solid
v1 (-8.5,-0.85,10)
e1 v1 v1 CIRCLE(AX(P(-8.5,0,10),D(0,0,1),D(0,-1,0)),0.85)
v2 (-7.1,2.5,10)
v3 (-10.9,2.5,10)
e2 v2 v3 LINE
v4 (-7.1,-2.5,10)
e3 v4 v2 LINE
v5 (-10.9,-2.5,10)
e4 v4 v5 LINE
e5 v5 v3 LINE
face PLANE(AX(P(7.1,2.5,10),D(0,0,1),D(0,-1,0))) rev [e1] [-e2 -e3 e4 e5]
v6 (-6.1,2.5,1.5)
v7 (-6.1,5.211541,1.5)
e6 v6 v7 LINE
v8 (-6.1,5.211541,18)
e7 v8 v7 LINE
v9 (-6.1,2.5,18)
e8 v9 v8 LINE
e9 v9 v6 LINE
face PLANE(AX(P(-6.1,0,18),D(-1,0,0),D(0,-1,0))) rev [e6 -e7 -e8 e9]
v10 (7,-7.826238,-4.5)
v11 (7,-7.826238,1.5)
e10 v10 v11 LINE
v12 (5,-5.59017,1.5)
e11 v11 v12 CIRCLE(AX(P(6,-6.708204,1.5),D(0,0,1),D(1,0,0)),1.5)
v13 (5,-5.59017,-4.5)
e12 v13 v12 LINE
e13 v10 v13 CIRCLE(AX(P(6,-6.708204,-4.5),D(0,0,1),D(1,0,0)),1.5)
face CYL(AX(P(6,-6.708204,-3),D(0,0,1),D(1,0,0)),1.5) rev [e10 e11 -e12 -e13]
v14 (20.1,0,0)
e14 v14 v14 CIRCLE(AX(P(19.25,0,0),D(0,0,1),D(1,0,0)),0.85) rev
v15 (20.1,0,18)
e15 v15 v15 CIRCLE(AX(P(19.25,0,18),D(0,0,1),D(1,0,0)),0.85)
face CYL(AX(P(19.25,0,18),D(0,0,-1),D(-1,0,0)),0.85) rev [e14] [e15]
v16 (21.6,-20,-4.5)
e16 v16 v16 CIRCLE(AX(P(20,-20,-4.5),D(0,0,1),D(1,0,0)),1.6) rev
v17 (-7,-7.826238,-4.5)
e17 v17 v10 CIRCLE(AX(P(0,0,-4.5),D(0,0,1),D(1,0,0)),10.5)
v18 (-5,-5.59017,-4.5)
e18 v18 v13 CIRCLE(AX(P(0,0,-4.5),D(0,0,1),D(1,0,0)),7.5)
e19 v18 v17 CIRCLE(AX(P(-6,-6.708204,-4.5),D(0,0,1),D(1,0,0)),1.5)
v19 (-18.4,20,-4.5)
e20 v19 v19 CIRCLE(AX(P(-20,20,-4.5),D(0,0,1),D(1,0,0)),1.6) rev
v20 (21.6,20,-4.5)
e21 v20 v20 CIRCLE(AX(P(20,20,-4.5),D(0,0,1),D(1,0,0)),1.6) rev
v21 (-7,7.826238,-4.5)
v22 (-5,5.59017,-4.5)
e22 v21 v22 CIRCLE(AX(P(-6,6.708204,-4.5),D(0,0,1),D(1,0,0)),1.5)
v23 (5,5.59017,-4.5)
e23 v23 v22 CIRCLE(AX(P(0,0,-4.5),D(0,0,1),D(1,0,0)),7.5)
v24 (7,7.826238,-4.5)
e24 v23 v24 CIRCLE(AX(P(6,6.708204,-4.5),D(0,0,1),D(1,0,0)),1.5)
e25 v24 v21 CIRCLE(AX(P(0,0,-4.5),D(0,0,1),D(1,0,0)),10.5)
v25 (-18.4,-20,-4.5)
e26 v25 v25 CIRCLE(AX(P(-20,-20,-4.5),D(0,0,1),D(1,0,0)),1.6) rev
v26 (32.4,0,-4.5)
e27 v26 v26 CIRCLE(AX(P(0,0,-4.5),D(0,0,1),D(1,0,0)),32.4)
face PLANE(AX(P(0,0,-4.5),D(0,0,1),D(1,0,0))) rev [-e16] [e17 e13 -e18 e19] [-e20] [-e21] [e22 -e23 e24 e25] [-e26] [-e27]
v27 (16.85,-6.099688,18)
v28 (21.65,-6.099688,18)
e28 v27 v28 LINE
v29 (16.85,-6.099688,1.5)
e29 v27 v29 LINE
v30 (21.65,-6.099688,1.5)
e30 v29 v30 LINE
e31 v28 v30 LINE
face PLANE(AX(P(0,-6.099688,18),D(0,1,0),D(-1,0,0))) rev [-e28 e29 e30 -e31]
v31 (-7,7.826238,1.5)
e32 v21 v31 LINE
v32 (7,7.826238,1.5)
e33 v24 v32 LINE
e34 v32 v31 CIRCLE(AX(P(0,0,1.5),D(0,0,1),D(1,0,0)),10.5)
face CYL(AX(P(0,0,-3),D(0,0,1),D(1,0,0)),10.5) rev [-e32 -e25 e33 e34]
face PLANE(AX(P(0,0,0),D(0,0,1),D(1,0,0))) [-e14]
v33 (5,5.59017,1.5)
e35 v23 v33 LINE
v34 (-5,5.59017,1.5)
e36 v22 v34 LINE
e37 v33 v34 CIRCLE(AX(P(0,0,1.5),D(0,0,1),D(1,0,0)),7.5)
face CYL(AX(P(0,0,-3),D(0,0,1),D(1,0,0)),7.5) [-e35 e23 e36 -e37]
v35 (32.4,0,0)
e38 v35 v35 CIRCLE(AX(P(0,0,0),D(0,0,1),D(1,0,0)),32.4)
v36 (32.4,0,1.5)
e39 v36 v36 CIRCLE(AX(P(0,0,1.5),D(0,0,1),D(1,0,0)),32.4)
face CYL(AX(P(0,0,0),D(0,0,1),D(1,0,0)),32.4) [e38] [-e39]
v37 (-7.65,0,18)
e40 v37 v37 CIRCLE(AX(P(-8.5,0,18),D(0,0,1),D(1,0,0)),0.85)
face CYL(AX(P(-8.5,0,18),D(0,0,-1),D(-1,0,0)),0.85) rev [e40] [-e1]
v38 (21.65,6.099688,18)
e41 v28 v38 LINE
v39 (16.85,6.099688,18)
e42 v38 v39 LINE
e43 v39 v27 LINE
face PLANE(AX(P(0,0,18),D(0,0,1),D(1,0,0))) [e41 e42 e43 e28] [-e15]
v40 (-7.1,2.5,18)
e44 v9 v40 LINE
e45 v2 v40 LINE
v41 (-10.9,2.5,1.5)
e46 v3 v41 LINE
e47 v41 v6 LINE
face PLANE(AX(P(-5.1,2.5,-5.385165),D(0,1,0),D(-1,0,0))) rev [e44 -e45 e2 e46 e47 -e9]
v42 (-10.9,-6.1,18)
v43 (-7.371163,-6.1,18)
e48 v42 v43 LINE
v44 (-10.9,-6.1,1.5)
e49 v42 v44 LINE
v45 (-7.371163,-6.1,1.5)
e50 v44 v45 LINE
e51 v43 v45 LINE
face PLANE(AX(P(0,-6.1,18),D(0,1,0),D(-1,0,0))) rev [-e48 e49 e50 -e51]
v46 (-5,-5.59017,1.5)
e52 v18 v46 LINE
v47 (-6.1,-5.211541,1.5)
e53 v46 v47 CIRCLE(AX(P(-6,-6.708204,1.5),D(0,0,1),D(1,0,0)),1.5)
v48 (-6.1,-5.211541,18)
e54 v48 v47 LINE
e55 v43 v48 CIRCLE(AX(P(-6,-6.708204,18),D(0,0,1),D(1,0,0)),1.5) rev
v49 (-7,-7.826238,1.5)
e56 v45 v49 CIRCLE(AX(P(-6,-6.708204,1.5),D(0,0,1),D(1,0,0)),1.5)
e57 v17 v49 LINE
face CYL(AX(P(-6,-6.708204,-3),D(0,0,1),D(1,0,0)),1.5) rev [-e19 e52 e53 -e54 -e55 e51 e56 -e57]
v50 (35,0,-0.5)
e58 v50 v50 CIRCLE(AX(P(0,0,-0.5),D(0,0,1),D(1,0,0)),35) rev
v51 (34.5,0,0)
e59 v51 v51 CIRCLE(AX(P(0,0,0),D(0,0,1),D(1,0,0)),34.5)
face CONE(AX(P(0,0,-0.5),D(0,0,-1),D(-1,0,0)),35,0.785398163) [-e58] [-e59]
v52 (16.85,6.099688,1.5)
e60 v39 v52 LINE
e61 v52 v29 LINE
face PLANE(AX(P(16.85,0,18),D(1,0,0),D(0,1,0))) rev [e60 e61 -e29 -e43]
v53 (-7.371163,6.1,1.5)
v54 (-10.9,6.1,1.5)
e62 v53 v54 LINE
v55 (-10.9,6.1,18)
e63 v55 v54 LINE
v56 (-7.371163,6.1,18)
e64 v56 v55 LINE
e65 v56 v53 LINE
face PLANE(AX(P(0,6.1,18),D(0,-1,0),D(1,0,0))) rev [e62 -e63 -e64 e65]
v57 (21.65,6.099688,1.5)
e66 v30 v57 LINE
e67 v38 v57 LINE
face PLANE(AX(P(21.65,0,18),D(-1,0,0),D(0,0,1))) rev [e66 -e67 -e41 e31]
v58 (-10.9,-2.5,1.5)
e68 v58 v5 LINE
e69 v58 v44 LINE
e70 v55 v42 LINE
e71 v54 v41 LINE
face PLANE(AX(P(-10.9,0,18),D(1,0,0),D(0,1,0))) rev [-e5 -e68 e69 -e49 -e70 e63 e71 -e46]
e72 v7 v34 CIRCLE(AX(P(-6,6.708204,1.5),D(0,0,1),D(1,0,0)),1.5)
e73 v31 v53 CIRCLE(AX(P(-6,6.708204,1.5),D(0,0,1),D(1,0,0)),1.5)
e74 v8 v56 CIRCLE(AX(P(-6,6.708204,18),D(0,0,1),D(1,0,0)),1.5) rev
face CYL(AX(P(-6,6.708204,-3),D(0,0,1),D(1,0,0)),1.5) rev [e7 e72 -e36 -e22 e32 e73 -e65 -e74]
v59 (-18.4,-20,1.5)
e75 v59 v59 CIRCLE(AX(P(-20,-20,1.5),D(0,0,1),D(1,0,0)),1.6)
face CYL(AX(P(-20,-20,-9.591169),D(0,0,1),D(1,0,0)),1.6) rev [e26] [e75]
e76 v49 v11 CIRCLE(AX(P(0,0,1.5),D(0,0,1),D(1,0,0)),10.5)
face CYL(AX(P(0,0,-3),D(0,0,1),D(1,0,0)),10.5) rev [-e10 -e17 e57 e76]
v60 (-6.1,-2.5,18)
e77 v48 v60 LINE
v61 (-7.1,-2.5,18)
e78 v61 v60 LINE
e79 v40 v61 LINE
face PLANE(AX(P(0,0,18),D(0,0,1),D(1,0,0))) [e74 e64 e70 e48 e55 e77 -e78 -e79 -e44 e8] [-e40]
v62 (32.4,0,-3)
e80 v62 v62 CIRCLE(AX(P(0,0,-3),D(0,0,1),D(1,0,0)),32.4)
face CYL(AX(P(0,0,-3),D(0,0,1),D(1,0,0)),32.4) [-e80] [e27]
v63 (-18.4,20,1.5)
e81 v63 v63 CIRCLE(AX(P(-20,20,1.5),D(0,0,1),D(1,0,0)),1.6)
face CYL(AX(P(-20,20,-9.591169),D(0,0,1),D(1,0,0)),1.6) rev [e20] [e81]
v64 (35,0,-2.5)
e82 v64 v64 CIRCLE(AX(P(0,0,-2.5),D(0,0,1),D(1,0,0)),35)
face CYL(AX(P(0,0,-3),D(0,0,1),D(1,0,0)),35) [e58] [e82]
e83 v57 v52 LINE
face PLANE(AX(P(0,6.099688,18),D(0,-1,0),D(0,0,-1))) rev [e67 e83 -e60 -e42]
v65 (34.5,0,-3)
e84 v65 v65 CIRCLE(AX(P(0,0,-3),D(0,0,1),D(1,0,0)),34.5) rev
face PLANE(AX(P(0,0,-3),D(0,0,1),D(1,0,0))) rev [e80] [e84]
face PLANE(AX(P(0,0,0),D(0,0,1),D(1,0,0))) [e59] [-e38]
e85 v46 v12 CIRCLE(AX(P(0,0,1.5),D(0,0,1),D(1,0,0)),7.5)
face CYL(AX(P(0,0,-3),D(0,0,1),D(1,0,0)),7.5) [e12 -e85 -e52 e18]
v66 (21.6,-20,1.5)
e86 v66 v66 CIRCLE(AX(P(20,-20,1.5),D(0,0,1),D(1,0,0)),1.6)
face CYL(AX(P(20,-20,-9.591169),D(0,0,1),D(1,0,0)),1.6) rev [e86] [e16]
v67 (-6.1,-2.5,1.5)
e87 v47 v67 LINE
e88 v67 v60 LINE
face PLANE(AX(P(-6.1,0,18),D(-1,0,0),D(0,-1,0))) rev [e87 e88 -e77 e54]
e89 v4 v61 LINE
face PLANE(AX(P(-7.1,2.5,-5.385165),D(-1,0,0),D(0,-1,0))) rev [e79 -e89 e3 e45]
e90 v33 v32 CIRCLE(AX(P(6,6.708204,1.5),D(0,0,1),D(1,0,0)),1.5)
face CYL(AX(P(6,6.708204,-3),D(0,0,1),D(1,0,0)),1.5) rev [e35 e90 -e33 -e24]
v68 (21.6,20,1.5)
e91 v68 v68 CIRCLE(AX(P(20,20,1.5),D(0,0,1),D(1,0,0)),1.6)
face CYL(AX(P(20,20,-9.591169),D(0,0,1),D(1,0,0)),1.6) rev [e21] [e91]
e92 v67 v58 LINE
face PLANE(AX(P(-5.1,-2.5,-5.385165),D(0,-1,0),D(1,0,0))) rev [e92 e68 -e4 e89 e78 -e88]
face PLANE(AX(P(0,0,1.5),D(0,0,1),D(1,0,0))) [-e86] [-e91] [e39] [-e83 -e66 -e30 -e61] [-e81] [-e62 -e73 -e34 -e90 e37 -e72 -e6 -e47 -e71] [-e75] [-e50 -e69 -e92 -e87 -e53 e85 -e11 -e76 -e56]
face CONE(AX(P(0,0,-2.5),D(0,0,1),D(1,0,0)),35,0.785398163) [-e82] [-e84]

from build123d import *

# Parameters (mm, degrees)
SKIZZE1_R                       = 32.4
SKIZZE1_R_2                     = 1.8
AUFSATZ_LINEAR_AUSTRAGEN1_DEPTH = 3
SCHNITT_LINEAR_AUSTRAGEN1_DEPTH = 46.918623673
AUFSATZ_LINEAR_START            = 18
SKIZZE4_R                       = 0.85
SKIZZE4_W                       = 4.8
SKIZZE4_H                       = 12.19937625
AUFSATZ_LINEAR_AUSTRAGEN2_DEPTH = 18
SKIZZE5_W                       = 2
SKIZZE5_H                       = 5
SCHNITT_LINEAR_AUSTRAGEN2_DEPTH = 18
SKIZZE6_W                       = 10
SKIZZE6_H                       = 5
SCHNITT_LINEAR_AUSTRAGEN3_DEPTH = 18
FL_CHE_VERSCHIEBEN1_BY          = 1.5
SKIZZE8_R                       = 35
SKIZZE8_R_2                     = 32.4
AUFSATZ_LINEAR_AUSTRAGEN3_DEPTH = 3
SKIZZE9_R                       = 1.8
SKIZZE9_R_2                     = 1.6
AUFSATZ_LINEAR_AUSTRAGEN4_DEPTH = 4.5
FL_CHE_VERSCHIEBEN2_OUTLINE_R   = 35
FL_CHE_VERSCHIEBEN2_OUTLINE_R_2 = 1.6
FL_CHE_VERSCHIEBEN2_OUTLINE_W   = 4.8
FL_CHE_VERSCHIEBEN2_OUTLINE_H   = 12.19937625
FL_CHE_VERSCHIEBEN2_DEPTH       = 1.5
SKIZZE10_R                      = 36.675991258
SKIZZE10_R_2                    = 32.4
SCHNITT_LINEAR_AUSTRAGEN4_DEPTH = 1.5
FASE1_SIZE                      = 0.5


# Read off the part's stored shape, not the designer's step: Fläche verschieben2
with BuildPart() as part:
    # Skizze1 → Aufsatz-Linear austragen1 (new body)
    with BuildSketch(Plane.XY):
        Circle(SKIZZE1_R)
        with Locations((-20, -20)):
            Circle(SKIZZE1_R_2, mode=Mode.SUBTRACT)
        with Locations((20, -20)):
            Circle(SKIZZE1_R_2, mode=Mode.SUBTRACT)
        with Locations((20, 20)):
            Circle(SKIZZE1_R_2, mode=Mode.SUBTRACT)
        with Locations((-20, 20)):
            Circle(SKIZZE1_R_2, mode=Mode.SUBTRACT)
    extrude(amount=-AUFSATZ_LINEAR_AUSTRAGEN1_DEPTH)

    # Skizze2 → Schnitt-Linear austragen1 (cut, through all)
    with BuildSketch(Plane.XY):
        with BuildLine():
            ThreePointArc((5, 5.590169944), (0, 7.5), (-5, 5.590169944))
            ThreePointArc((-5, 5.590169944), (-5.511799249, 5.289873919), (-6.1, 5.211540978))
            ThreePointArc((-6.1, 5.211540978), (-6.859313681, 5.478740636), (-7.371163001, 6.1))
            ThreePointArc((-7.371163001, 6.1), (-7.466484857, 7.023516737), (-7, 7.826237921))
            ThreePointArc((-7, 7.826237921), (0, 10.5), (7, 7.826237921))
            ThreePointArc((7, 7.826237921), (7.118033989, 5.708203932), (5, 5.590169944))
        make_face()
        with BuildLine():
            ThreePointArc((-7, -7.826237921), (0, -10.5), (7, -7.826237921))
            ThreePointArc((7, -7.826237921), (7.118033989, -5.708203932), (5, -5.590169944))
            ThreePointArc((5, -5.590169944), (0, -7.5), (-5, -5.590169944))
            ThreePointArc((-5, -5.590169944), (-5.511799249, -5.289873919), (-6.1, -5.211540978))
            ThreePointArc((-6.1, -5.211540978), (-6.859313681, -5.478740636), (-7.371163001, -6.1))
            ThreePointArc((-7.371163001, -6.1), (-7.466484857, -7.023516737), (-7, -7.826237921))
        make_face()
    extrude(amount=-SCHNITT_LINEAR_AUSTRAGEN1_DEPTH, mode=Mode.SUBTRACT)

    # Skizze4 → Aufsatz-Linear austragen2 (add)
    # profile 1 of 2: a face of its own
    with BuildSketch(Plane.XY.offset(AUFSATZ_LINEAR_START)):
        with BuildLine():
            Line((-10.9, 6.1), (-10.9, -6.1))
            Line((-10.9, -6.1), (-7.371163001, -6.1))
            ThreePointArc((-7.371163001, -6.1), (-6.859313681, -5.478740636), (-6.1, -5.211540978))
            Line((-6.1, -5.211540978), (-6.1, 0.782623792))
            Line((-6.1, 0.782623792), (-6.1, 5.211540978))
            ThreePointArc((-6.1, 5.211540978), (-6.859313681, 5.478740636), (-7.371163001, 6.1))
            Line((-7.371163001, 6.1), (-10.9, 6.1))
        make_face()
        with Locations((-8.5, 0)):
            Circle(SKIZZE4_R, mode=Mode.SUBTRACT)
    # profile 2 of 2: a face of its own
    with BuildSketch(Plane.XY.offset(AUFSATZ_LINEAR_START)):
        with Locations((19.25, 0)):
            Rectangle(SKIZZE4_W, SKIZZE4_H)
        with Locations((19.25, 0)):
            Circle(SKIZZE4_R, mode=Mode.SUBTRACT)
    extrude(amount=-AUFSATZ_LINEAR_AUSTRAGEN2_DEPTH)

    # Skizze5 → Schnitt-Linear austragen2 (cut)
    with BuildSketch(Plane.XY.offset(18)):
        with Locations((-6.1, 0)):
            Rectangle(SKIZZE5_W, SKIZZE5_H)
    extrude(amount=-SCHNITT_LINEAR_AUSTRAGEN2_DEPTH, mode=Mode.SUBTRACT)

    # Skizze6 → Schnitt-Linear austragen3 (cut)
    with BuildSketch(Plane.ZY.offset(10.9)):
        with Locations((5, 0)):
            Rectangle(SKIZZE6_W, SKIZZE6_H)
    extrude(amount=-SCHNITT_LINEAR_AUSTRAGEN3_DEPTH, mode=Mode.SUBTRACT)

    # Fläche verschieben1: a face moved outward by 1.5
    extrude(part.faces().sort_by_distance((0, 0, -3))[0], amount=FL_CHE_VERSCHIEBEN1_BY, dir=(0, 0, -1))

    # Skizze8 → Aufsatz-Linear austragen3 (add)
    with BuildSketch(Plane.XY):
        Circle(SKIZZE8_R)
        Circle(SKIZZE8_R_2, mode=Mode.SUBTRACT)
    extrude(amount=-AUFSATZ_LINEAR_AUSTRAGEN3_DEPTH)

    # Skizze9 → Aufsatz-Linear austragen4 (add)
    # profile 1 of 4: a face of its own
    with BuildSketch(Plane.XY):
        with Locations((-20, 20)):
            Circle(SKIZZE9_R)
        with Locations((-20, 20)):
            Circle(SKIZZE9_R_2, mode=Mode.SUBTRACT)
    # profile 2 of 4: a face of its own
    with BuildSketch(Plane.XY):
        with Locations((20, 20)):
            Circle(SKIZZE9_R)
        with Locations((20, 20)):
            Circle(SKIZZE9_R_2, mode=Mode.SUBTRACT)
    # profile 3 of 4: a face of its own
    with BuildSketch(Plane.XY):
        with Locations((20, -20)):
            Circle(SKIZZE9_R)
        with Locations((20, -20)):
            Circle(SKIZZE9_R_2, mode=Mode.SUBTRACT)
    # profile 4 of 4: a face of its own
    with BuildSketch(Plane.XY):
        with Locations((-20, -20)):
            Circle(SKIZZE9_R)
        with Locations((-20, -20)):
            Circle(SKIZZE9_R_2, mode=Mode.SUBTRACT)
    extrude(amount=-AUFSATZ_LINEAR_AUSTRAGEN4_DEPTH)

    # Fläche verschieben2 outline → Fläche verschieben2 (add)
    with BuildSketch(Plane.XY):
        Circle(FL_CHE_VERSCHIEBEN2_OUTLINE_R)
        with Locations((-20, -20)):
            Circle(FL_CHE_VERSCHIEBEN2_OUTLINE_R_2, mode=Mode.SUBTRACT)
        with BuildLine():
            ThreePointArc((7, -7.826237921), (0, -10.5), (-7, -7.826237921))
            ThreePointArc((-7, -7.826237921), (-7.466484857, -7.023516737), (-7.371163002, -6.1))
            Line((-7.371163002, -6.1), (-10.9, -6.1))
            Line((-10.9, -6.1), (-10.9, -2.5))
            Line((-10.9, -2.5), (-6.1, -2.5))
            Line((-6.1, -2.5), (-6.1, -5.211540977))
            ThreePointArc((-6.1, -5.211540977), (-5.511799249, -5.289873919), (-5, -5.590169944))
            ThreePointArc((-5, -5.590169944), (0, -7.5), (5, -5.590169944))
            ThreePointArc((5, -5.590169944), (7.118033989, -5.708203932), (7, -7.826237921))
        make_face(mode=Mode.SUBTRACT)
        with Locations((20, -20)):
            Circle(FL_CHE_VERSCHIEBEN2_OUTLINE_R_2, mode=Mode.SUBTRACT)
        with BuildLine():
            Line((-6.1, 2.5), (-10.9, 2.5))
            Line((-10.9, 2.5), (-10.9, 6.1))
            Line((-10.9, 6.1), (-7.371163002, 6.1))
            ThreePointArc((-7.371163002, 6.1), (-7.466484857, 7.023516737), (-7, 7.826237921))
            ThreePointArc((-7, 7.826237921), (0, 10.5), (7, 7.826237921))
            ThreePointArc((7, 7.826237921), (7.118033989, 5.708203932), (5, 5.590169944))
            ThreePointArc((5, 5.590169944), (0, 7.5), (-5, 5.590169944))
            ThreePointArc((-5, 5.590169944), (-5.511799249, 5.289873919), (-6.1, 5.211540977))
            Line((-6.1, 5.211540977), (-6.1, 2.5))
        make_face(mode=Mode.SUBTRACT)
        with Locations((-20, 20)):
            Circle(FL_CHE_VERSCHIEBEN2_OUTLINE_R_2, mode=Mode.SUBTRACT)
        with Locations((19.25, 0)):
            Rectangle(FL_CHE_VERSCHIEBEN2_OUTLINE_W, FL_CHE_VERSCHIEBEN2_OUTLINE_H, mode=Mode.SUBTRACT)
        with Locations((20, 20)):
            Circle(FL_CHE_VERSCHIEBEN2_OUTLINE_R_2, mode=Mode.SUBTRACT)
    extrude(amount=FL_CHE_VERSCHIEBEN2_DEPTH)

    # Skizze10 → Schnitt-Linear austragen4 (cut)
    with BuildSketch(Plane.XY.offset(1.5)):
        Circle(SKIZZE10_R)
        Circle(SKIZZE10_R_2, mode=Mode.SUBTRACT)
    extrude(amount=-SCHNITT_LINEAR_AUSTRAGEN4_DEPTH, mode=Mode.SUBTRACT)

    # Fase1
    fase1_edges = [part.edges().sort_by_distance(p)[0] for p in [
        (-35, 0, -3),
        (-35, 0, 0),
    ]]
    chamfer(fase1_edges, length=FASE1_SIZE)


solid = part.part
